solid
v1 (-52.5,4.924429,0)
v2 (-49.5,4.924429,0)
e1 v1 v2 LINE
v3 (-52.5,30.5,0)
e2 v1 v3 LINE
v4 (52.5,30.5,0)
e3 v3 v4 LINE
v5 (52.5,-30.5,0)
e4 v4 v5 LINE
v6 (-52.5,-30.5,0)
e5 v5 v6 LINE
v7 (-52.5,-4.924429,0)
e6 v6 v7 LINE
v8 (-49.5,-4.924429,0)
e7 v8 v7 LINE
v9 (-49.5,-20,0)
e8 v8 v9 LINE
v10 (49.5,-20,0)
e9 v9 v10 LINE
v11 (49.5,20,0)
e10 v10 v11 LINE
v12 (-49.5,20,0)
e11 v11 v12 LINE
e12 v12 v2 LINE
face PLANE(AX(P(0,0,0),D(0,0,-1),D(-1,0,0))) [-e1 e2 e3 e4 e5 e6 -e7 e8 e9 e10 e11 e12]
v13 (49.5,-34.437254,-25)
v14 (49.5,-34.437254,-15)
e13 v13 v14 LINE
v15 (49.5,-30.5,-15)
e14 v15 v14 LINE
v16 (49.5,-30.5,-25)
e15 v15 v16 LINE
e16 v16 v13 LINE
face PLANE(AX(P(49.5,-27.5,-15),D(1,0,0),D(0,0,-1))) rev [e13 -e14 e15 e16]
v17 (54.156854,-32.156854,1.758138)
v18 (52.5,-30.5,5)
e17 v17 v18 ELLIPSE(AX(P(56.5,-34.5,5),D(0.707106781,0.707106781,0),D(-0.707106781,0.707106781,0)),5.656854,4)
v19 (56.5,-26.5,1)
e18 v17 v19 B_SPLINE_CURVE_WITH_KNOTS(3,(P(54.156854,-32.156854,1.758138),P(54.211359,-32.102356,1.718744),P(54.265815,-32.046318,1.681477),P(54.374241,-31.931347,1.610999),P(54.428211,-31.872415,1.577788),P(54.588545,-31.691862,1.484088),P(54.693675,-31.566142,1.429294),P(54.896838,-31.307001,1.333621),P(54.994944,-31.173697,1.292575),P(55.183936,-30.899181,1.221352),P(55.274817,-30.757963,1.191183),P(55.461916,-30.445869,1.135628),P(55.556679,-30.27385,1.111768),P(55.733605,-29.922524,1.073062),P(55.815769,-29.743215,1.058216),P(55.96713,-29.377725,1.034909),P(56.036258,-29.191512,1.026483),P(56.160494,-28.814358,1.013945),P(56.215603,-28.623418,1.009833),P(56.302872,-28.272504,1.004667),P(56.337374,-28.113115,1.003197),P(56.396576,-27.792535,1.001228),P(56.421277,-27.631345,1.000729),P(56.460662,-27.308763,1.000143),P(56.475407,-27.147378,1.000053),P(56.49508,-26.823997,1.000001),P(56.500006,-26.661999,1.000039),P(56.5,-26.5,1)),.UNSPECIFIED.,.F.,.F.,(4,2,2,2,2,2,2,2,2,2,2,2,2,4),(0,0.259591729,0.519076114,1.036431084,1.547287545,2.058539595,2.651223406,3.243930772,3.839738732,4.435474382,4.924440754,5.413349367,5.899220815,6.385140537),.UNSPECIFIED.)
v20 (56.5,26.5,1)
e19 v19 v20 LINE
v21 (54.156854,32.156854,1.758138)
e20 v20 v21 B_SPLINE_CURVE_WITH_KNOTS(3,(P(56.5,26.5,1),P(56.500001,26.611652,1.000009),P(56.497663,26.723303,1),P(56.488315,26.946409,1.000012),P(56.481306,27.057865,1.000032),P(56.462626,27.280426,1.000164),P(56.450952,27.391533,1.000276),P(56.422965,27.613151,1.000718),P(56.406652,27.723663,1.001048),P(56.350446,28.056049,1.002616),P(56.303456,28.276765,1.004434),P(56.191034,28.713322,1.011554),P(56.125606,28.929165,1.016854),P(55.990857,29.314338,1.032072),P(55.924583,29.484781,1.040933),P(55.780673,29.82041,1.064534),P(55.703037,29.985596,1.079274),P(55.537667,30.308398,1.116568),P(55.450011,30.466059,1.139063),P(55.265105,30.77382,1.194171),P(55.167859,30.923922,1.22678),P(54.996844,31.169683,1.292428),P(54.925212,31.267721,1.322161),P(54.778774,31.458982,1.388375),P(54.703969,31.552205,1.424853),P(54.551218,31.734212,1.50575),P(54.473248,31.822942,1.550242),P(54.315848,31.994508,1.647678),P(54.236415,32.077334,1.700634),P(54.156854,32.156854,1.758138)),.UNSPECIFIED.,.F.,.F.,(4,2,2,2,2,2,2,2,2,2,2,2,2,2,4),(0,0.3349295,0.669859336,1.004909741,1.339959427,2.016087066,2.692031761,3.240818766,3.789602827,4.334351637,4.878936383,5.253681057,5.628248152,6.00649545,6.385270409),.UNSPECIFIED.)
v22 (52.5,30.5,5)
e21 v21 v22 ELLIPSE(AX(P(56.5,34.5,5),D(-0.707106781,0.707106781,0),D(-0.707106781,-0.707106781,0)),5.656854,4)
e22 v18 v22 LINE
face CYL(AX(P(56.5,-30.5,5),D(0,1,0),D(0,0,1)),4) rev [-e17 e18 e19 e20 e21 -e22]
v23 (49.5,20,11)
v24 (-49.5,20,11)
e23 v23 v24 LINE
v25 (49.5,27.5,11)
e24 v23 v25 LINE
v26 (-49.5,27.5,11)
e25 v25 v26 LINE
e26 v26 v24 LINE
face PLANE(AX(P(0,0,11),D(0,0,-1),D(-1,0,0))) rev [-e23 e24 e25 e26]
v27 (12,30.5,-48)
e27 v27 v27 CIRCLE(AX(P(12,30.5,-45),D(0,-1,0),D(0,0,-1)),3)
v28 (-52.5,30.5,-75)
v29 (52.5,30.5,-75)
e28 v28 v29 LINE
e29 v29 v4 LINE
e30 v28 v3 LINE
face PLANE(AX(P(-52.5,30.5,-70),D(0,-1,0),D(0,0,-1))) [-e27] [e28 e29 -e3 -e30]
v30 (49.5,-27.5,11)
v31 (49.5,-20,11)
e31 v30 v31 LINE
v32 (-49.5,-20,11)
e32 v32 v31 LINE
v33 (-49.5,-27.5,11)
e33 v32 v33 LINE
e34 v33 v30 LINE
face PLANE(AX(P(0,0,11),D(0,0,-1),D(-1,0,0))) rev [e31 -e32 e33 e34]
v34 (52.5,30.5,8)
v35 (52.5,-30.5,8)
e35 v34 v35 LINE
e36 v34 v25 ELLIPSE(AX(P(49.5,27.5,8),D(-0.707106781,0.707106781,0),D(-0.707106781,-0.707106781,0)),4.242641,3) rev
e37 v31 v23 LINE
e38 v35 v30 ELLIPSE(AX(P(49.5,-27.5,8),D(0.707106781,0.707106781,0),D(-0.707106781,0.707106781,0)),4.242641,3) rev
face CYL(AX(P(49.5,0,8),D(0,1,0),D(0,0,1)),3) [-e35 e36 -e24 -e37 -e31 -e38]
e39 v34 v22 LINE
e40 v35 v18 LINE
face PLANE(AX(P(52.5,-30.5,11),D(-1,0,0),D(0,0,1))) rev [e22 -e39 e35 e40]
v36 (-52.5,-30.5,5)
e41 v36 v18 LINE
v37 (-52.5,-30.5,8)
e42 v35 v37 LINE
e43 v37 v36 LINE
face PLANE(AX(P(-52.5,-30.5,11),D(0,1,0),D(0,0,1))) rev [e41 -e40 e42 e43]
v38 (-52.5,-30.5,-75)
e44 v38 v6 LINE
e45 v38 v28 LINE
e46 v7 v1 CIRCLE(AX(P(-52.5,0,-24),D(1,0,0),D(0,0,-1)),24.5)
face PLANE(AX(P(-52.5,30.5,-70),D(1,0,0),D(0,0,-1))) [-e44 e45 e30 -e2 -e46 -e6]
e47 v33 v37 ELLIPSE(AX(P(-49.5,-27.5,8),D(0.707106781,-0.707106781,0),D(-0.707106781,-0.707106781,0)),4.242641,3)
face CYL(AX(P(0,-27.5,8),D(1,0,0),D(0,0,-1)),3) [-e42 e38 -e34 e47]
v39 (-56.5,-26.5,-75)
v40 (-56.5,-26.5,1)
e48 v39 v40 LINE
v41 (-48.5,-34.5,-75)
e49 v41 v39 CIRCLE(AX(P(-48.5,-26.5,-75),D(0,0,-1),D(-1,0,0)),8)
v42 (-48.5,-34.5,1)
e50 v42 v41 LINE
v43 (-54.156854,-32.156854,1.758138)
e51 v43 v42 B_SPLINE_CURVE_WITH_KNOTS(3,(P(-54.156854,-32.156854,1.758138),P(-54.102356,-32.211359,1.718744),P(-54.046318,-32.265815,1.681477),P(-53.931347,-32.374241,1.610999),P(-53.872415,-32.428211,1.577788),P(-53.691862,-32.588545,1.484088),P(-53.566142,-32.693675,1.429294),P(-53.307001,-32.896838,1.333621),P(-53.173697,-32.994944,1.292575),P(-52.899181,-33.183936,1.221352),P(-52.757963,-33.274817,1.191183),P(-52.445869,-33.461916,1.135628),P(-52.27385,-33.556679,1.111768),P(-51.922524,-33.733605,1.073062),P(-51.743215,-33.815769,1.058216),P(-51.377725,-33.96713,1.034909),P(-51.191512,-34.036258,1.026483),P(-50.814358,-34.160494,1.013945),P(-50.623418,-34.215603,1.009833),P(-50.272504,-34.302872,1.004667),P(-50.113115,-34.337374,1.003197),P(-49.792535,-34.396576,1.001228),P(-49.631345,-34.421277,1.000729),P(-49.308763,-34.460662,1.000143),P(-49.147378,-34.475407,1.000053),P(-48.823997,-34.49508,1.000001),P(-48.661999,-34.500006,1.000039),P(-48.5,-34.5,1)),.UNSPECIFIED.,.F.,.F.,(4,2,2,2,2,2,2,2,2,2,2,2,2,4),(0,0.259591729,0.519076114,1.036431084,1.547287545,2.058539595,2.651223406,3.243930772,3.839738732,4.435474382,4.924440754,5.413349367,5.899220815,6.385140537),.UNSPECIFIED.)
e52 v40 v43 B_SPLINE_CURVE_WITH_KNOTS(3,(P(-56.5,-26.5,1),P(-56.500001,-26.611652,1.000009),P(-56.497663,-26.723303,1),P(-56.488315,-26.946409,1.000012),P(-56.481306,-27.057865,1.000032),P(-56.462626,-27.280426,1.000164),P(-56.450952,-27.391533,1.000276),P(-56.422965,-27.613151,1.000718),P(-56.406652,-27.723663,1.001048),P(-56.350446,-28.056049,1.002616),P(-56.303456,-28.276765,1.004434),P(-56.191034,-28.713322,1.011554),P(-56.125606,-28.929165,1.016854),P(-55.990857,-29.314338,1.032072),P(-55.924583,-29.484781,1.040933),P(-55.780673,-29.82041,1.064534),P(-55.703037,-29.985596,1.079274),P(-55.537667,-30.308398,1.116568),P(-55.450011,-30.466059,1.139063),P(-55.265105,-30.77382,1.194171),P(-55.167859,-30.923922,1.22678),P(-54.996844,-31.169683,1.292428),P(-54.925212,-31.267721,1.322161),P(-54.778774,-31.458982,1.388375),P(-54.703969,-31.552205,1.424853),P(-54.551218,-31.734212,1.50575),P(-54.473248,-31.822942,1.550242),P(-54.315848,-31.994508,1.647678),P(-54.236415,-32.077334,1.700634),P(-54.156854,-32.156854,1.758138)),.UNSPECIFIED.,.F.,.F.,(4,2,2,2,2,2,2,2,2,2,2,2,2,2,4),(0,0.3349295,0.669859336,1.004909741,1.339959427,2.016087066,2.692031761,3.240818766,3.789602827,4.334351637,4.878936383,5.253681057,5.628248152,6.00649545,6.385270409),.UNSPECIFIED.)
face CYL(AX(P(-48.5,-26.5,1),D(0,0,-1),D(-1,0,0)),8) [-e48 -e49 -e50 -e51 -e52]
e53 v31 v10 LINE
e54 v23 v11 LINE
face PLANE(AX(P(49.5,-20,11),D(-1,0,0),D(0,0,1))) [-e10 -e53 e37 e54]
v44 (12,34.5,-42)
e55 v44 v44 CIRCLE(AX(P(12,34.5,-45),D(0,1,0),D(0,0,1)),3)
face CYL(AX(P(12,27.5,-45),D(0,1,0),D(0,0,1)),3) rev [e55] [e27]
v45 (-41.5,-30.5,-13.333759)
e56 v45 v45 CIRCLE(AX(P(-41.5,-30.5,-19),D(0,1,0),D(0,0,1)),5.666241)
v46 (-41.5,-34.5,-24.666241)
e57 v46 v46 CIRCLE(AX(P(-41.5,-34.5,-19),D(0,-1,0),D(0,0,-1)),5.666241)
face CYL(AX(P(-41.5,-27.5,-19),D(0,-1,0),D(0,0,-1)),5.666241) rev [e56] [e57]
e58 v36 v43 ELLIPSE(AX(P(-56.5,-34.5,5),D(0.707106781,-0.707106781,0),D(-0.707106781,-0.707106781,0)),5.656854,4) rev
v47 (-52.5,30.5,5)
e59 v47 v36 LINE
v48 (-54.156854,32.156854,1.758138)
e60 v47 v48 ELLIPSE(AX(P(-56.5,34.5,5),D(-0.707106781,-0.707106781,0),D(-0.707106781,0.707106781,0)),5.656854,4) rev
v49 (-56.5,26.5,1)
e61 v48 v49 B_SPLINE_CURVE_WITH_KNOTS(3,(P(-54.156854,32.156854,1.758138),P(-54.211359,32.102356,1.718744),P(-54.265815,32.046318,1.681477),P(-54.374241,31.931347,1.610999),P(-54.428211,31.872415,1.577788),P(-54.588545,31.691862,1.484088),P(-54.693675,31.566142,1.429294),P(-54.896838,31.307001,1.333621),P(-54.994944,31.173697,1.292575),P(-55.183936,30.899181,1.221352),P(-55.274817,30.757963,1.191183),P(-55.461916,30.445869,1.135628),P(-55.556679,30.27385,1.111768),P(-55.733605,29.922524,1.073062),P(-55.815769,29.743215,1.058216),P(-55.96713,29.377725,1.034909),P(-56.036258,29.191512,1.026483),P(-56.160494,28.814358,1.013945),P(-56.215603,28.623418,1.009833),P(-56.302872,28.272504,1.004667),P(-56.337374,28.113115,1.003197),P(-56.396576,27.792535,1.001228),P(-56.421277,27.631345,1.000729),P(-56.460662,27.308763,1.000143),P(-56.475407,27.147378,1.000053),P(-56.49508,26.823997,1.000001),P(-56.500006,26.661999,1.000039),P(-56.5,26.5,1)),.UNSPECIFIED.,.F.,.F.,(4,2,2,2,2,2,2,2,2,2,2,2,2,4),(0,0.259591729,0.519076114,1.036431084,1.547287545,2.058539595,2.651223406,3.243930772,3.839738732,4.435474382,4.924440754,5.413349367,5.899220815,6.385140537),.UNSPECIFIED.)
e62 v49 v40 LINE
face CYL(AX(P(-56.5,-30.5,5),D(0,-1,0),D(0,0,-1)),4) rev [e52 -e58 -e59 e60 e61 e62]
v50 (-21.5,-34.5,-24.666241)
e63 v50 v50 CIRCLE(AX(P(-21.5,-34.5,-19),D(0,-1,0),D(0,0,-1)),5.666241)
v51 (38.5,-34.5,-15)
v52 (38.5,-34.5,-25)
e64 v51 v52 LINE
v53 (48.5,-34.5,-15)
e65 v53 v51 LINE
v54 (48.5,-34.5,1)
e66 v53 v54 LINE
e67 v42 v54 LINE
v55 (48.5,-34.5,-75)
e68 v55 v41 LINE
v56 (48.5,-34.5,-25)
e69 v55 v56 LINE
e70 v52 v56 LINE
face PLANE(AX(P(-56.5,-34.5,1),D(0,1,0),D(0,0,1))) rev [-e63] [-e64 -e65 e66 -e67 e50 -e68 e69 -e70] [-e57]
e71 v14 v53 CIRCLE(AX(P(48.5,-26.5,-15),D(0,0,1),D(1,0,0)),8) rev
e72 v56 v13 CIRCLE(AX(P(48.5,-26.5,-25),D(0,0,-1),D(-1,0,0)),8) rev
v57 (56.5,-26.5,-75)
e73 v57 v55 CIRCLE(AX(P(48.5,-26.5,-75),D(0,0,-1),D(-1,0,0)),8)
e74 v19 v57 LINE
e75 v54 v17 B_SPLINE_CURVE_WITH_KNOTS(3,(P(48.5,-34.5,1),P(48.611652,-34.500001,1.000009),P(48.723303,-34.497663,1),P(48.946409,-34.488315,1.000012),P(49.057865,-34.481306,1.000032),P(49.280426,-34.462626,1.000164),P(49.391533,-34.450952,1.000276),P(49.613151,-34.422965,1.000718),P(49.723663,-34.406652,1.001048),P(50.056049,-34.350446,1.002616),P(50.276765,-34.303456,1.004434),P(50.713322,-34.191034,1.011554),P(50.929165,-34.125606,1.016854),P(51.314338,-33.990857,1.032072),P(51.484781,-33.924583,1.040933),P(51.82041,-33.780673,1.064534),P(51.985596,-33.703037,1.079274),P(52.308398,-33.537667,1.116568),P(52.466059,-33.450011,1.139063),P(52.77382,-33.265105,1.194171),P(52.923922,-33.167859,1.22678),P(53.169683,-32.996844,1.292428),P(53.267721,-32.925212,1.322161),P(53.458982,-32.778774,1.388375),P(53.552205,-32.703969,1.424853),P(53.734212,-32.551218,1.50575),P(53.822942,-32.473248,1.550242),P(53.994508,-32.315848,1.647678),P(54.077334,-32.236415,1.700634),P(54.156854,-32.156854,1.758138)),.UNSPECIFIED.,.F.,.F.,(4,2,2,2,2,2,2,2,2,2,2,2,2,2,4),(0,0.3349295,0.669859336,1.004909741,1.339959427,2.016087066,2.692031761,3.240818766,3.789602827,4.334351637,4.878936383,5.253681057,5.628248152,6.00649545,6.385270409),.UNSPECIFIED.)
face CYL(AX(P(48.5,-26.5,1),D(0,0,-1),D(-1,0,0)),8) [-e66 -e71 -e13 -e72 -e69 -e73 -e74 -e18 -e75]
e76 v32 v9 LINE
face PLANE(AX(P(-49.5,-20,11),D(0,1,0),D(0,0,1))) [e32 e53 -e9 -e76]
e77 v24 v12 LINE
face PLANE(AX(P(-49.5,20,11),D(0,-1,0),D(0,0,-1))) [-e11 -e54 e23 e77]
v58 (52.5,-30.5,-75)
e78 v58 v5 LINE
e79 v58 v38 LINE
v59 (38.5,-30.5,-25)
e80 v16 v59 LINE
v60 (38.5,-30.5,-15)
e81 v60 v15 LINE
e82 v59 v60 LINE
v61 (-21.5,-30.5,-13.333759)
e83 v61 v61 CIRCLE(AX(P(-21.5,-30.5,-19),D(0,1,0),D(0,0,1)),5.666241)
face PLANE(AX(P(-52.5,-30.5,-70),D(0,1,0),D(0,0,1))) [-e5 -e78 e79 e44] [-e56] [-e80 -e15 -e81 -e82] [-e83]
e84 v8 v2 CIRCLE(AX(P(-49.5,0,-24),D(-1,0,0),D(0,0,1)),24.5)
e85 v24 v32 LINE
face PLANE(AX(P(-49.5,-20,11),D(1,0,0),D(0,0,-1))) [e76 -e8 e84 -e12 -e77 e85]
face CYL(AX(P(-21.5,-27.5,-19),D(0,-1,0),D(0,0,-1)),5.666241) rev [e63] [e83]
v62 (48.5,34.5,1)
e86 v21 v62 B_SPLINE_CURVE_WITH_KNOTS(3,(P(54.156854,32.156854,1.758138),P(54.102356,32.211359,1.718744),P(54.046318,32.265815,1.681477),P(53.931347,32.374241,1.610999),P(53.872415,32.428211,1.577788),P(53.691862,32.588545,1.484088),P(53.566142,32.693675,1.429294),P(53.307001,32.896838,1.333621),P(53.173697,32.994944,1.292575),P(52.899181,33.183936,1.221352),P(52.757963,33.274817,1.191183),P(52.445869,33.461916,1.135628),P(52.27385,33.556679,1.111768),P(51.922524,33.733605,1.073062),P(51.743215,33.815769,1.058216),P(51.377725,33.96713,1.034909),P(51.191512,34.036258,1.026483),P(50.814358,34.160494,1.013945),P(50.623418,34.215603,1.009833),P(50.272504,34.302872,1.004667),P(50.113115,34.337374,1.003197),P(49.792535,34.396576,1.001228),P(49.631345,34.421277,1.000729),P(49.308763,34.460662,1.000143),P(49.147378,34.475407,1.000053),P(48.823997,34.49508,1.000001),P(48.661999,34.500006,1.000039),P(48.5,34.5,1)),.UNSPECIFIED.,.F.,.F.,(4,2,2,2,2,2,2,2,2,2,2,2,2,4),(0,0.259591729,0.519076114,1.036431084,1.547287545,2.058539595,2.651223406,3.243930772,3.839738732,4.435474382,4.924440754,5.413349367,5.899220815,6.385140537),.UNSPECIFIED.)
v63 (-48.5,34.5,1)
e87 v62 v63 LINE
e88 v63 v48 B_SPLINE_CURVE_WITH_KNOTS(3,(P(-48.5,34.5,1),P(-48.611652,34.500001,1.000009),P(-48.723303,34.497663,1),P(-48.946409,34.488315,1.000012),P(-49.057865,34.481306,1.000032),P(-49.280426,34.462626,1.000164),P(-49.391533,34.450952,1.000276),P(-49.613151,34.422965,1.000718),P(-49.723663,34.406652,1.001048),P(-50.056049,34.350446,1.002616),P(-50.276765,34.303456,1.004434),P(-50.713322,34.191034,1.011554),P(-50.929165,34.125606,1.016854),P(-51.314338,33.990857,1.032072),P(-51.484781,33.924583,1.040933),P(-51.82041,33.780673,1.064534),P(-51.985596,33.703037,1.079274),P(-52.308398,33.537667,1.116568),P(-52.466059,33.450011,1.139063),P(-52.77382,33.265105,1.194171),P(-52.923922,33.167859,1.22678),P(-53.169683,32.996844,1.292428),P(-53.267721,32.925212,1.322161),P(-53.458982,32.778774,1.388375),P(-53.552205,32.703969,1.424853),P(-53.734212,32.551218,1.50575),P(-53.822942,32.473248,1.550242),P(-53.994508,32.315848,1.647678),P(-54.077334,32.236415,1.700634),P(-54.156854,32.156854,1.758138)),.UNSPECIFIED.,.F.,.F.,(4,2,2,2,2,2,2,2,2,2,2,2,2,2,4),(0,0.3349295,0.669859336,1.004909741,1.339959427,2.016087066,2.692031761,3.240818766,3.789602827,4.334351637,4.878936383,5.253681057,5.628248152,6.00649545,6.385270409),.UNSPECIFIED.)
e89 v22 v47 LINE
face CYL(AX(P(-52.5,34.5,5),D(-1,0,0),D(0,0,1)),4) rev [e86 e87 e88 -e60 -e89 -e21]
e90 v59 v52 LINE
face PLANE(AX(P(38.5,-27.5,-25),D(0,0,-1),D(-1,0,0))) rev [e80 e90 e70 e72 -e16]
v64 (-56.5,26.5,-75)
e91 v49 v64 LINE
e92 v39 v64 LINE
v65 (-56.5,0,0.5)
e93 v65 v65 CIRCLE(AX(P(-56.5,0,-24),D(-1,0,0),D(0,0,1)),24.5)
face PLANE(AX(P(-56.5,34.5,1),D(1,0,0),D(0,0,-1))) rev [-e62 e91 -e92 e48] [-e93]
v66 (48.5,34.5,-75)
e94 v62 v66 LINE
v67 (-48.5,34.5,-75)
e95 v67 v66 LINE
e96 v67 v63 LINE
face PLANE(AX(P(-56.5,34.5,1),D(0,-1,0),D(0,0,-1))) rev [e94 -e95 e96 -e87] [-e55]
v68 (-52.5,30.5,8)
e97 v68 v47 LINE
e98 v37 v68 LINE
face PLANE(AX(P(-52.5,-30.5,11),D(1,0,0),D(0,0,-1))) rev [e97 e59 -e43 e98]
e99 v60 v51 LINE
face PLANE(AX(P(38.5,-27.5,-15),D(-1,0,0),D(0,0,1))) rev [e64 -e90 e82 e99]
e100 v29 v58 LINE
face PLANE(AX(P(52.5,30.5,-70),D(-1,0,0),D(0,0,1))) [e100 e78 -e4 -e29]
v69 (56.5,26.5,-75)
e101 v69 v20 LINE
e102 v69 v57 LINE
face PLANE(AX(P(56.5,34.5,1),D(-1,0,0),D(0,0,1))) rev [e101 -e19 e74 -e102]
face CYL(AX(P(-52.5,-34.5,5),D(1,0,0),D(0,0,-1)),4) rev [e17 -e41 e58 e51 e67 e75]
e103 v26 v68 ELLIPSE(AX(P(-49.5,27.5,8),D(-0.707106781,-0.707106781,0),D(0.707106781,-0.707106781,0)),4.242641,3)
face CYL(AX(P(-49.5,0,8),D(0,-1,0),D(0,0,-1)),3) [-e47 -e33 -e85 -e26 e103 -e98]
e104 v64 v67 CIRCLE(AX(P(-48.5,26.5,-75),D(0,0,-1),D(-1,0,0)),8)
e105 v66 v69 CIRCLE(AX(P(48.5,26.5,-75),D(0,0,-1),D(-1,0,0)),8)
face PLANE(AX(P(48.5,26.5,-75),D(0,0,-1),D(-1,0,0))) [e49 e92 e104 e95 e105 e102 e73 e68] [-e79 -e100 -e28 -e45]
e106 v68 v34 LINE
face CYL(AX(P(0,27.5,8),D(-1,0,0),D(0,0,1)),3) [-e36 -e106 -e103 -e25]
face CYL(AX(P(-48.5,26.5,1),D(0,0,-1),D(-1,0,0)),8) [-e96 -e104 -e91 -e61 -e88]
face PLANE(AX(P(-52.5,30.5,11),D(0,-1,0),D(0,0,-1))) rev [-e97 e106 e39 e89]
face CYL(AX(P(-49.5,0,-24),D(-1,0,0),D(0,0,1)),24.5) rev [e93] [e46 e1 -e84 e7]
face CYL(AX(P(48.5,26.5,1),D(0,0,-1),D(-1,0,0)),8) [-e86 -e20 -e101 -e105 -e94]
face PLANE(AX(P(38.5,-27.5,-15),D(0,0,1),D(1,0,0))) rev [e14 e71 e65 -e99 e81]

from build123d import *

# Parameters (mm, degrees)
IZIM1_W                     = 105
IZIM1_H                     = 61
IZIM1_W_2                   = 99
IZIM1_H_2                   = 40
Y_KSEKLIK_EKSTR_ZYON1_DEPTH = 11
IZIM2_W                     = 113
IZIM2_H                     = 69
IZIM2_W_2                   = 105
IZIM2_H_2                   = 61
Y_KSEKLIK_EKSTR_ZYON2_DEPTH = 70
IZIM3_W                     = 113
IZIM3_H                     = 69
IZIM3_W_2                   = 99
IZIM3_H_2                   = 40
Y_KSEKLIK_EKSTR_ZYON3_DEPTH = 1
IZIM4_R                     = 24.5
KES_EKSTR_ZYON1_DEPTH       = 7
IZIM5_R                     = 3
KES_EKSTR_ZYON2_DEPTH       = 7
IZIM6_R                     = 5.666240849
IZIM6_W                     = 11
IZIM6_H                     = 10
KES_EKSTR_ZYON3_DEPTH       = 7
RADYUS1_R                   = 4
RADYUS2_R                   = 3
RADYUS4_R                   = 8
IZIM14_W                    = 105
IZIM14_H                    = 61
Y_KSEKLIK_EKSTR_ZYON8_DEPTH = 5


# Some blends are built 0.0001 mm under size
with BuildPart() as part:
    # Çizim1 → Yükseklik-Ekstrüzyon1 (new body)
    with BuildSketch(Plane.XY):
        Rectangle(IZIM1_W, IZIM1_H)
        Rectangle(IZIM1_W_2, IZIM1_H_2, mode=Mode.SUBTRACT)
    extrude(amount=Y_KSEKLIK_EKSTR_ZYON1_DEPTH)



with BuildPart() as body_2:
    # Çizim2 → Yükseklik-Ekstrüzyon2 (new body)
    with BuildSketch(Plane(origin=(0, 0, 0), x_dir=(-1, 0, 0), z_dir=(0, 0, -1))):
        Rectangle(IZIM2_W, IZIM2_H)
        Rectangle(IZIM2_W_2, IZIM2_H_2, mode=Mode.SUBTRACT)
    extrude(amount=Y_KSEKLIK_EKSTR_ZYON2_DEPTH)


with BuildPart() as part_1:
    add(part.part)

    add(body_2.part)  # Yükseklik-Ekstrüzyon3 merges body 2
    # Çizim3 → Yükseklik-Ekstrüzyon3 (add)
    with BuildSketch(Plane.XY):
        Rectangle(IZIM3_W, IZIM3_H)
        Rectangle(IZIM3_W_2, IZIM3_H_2, mode=Mode.SUBTRACT)
    extrude(amount=Y_KSEKLIK_EKSTR_ZYON3_DEPTH)

    # Çizim4 → Kes-Ekstrüzyon1 (cut)
    with BuildSketch(Plane.ZY.offset(56.5)):
        with Locations((-24, 0)):
            Circle(IZIM4_R)
    extrude(amount=-KES_EKSTR_ZYON1_DEPTH, mode=Mode.SUBTRACT)

    # Çizim5 → Kes-Ekstrüzyon2 (cut)
    with BuildSketch(Plane(origin=(0, 34.5, 0), x_dir=(1, 0, 0), z_dir=(0, 1, 0))):
        with Locations(Location((12, 45, 0), (0, 0, 270))):
            Circle(IZIM5_R)
    extrude(amount=-KES_EKSTR_ZYON2_DEPTH, mode=Mode.SUBTRACT)

    # Çizim6 → Kes-Ekstrüzyon3 (cut)
    with BuildSketch(Plane(origin=(0, -34.5, 0), x_dir=(-1, 0, 0), z_dir=(0, -1, 0))):
        with Locations(Location((41.5, 19, 0), (0, 0, 90))):
            Circle(IZIM6_R)
        with Locations(Location((21.5, 19, 0), (0, 0, 90))):
            Circle(IZIM6_R)
        with Locations((-44, 20)):
            Rectangle(IZIM6_W, IZIM6_H)
    extrude(amount=-KES_EKSTR_ZYON3_DEPTH, mode=Mode.SUBTRACT)

    # Radyus1
    radyus1_edges = [part_1.edges().sort_by_distance(p)[0] for p in [
        (0, -30.5, 1),
        (52.5, 0, 1),
        (0, 30.5, 1),
        (-52.5, 0, 1),
    ]]
    fillet(radyus1_edges, radius=RADYUS1_R - 0.0001)  # a hair under: the kernel refuses the full size

    # Radyus2
    radyus2_edges = [part_1.edges().sort_by_distance(p)[0] for p in [
        (-52.5, 0, 11),
        (0, -30.5, 11),
        (52.5, 0, 11),
        (0, 30.5, 11),
    ]]
    fillet(radyus2_edges, radius=RADYUS2_R - 0.0001)  # a hair under: the kernel refuses the full size

    # Radyus4
    # the kernel refuses this fillet: 8 mm, written as the material it takes off along each edge
    with BuildSketch(Plane(origin=(56.5, -34.5, 21), x_dir=(0, 1, 0), z_dir=(0, 0, -1)), Plane(origin=(56.5, 34.5, 21), x_dir=(-1, 0, 0), z_dir=(0, 0, -1)), Plane(origin=(-56.5, 34.5, -90), x_dir=(1, 0, 0), z_dir=(0, 0, 1))) as radyus4_piece_1:
        with BuildLine():
            CenterArc((RADYUS4_R, -RADYUS4_R), RADYUS4_R, 90, 90)
            Line((0, -RADYUS4_R), (0, 0))
            Line((0, 0), (RADYUS4_R, 0))
        make_face()
    extrude(amount=111, mode=Mode.SUBTRACT)
    with BuildSketch(Plane(origin=(-56.5, -34.5, 21), x_dir=(0, 1, 0), z_dir=(0, 0, -1))) as radyus4_piece_2:
        with BuildLine():
            CenterArc((RADYUS4_R, RADYUS4_R), RADYUS4_R, 180, 90)
            Line((0, RADYUS4_R), (0, 0))
            Line((0, 0), (RADYUS4_R, 0))
        make_face()
    extrude(amount=111, mode=Mode.SUBTRACT)

    # Çizim14 → Yükseklik-Ekstrüzyon8 (add)
    with BuildSketch(Plane(origin=(0, 0, -70), x_dir=(-1, 0, 0), z_dir=(0, 0, -1))):
        with BuildLine():
            Line((-56.5, 26.5), (-56.5, -26.5))
            ThreePointArc((-56.5, -26.5), (-54.156854249, -32.156854249), (-48.5, -34.5))
            Line((-48.5, -34.5), (48.5, -34.5))
            ThreePointArc((48.5, -34.5), (54.156854249, -32.156854249), (56.5, -26.5))
            Line((56.5, -26.5), (56.5, 26.5))
            ThreePointArc((56.5, 26.5), (54.156854249, 32.156854249), (48.5, 34.5))
            Line((48.5, 34.5), (-48.5, 34.5))
            ThreePointArc((-48.5, 34.5), (-54.156854249, 32.156854249), (-56.5, 26.5))
        make_face()
        Rectangle(IZIM14_W, IZIM14_H, mode=Mode.SUBTRACT)
    extrude(amount=Y_KSEKLIK_EKSTR_ZYON8_DEPTH)


solid = part_1.part
